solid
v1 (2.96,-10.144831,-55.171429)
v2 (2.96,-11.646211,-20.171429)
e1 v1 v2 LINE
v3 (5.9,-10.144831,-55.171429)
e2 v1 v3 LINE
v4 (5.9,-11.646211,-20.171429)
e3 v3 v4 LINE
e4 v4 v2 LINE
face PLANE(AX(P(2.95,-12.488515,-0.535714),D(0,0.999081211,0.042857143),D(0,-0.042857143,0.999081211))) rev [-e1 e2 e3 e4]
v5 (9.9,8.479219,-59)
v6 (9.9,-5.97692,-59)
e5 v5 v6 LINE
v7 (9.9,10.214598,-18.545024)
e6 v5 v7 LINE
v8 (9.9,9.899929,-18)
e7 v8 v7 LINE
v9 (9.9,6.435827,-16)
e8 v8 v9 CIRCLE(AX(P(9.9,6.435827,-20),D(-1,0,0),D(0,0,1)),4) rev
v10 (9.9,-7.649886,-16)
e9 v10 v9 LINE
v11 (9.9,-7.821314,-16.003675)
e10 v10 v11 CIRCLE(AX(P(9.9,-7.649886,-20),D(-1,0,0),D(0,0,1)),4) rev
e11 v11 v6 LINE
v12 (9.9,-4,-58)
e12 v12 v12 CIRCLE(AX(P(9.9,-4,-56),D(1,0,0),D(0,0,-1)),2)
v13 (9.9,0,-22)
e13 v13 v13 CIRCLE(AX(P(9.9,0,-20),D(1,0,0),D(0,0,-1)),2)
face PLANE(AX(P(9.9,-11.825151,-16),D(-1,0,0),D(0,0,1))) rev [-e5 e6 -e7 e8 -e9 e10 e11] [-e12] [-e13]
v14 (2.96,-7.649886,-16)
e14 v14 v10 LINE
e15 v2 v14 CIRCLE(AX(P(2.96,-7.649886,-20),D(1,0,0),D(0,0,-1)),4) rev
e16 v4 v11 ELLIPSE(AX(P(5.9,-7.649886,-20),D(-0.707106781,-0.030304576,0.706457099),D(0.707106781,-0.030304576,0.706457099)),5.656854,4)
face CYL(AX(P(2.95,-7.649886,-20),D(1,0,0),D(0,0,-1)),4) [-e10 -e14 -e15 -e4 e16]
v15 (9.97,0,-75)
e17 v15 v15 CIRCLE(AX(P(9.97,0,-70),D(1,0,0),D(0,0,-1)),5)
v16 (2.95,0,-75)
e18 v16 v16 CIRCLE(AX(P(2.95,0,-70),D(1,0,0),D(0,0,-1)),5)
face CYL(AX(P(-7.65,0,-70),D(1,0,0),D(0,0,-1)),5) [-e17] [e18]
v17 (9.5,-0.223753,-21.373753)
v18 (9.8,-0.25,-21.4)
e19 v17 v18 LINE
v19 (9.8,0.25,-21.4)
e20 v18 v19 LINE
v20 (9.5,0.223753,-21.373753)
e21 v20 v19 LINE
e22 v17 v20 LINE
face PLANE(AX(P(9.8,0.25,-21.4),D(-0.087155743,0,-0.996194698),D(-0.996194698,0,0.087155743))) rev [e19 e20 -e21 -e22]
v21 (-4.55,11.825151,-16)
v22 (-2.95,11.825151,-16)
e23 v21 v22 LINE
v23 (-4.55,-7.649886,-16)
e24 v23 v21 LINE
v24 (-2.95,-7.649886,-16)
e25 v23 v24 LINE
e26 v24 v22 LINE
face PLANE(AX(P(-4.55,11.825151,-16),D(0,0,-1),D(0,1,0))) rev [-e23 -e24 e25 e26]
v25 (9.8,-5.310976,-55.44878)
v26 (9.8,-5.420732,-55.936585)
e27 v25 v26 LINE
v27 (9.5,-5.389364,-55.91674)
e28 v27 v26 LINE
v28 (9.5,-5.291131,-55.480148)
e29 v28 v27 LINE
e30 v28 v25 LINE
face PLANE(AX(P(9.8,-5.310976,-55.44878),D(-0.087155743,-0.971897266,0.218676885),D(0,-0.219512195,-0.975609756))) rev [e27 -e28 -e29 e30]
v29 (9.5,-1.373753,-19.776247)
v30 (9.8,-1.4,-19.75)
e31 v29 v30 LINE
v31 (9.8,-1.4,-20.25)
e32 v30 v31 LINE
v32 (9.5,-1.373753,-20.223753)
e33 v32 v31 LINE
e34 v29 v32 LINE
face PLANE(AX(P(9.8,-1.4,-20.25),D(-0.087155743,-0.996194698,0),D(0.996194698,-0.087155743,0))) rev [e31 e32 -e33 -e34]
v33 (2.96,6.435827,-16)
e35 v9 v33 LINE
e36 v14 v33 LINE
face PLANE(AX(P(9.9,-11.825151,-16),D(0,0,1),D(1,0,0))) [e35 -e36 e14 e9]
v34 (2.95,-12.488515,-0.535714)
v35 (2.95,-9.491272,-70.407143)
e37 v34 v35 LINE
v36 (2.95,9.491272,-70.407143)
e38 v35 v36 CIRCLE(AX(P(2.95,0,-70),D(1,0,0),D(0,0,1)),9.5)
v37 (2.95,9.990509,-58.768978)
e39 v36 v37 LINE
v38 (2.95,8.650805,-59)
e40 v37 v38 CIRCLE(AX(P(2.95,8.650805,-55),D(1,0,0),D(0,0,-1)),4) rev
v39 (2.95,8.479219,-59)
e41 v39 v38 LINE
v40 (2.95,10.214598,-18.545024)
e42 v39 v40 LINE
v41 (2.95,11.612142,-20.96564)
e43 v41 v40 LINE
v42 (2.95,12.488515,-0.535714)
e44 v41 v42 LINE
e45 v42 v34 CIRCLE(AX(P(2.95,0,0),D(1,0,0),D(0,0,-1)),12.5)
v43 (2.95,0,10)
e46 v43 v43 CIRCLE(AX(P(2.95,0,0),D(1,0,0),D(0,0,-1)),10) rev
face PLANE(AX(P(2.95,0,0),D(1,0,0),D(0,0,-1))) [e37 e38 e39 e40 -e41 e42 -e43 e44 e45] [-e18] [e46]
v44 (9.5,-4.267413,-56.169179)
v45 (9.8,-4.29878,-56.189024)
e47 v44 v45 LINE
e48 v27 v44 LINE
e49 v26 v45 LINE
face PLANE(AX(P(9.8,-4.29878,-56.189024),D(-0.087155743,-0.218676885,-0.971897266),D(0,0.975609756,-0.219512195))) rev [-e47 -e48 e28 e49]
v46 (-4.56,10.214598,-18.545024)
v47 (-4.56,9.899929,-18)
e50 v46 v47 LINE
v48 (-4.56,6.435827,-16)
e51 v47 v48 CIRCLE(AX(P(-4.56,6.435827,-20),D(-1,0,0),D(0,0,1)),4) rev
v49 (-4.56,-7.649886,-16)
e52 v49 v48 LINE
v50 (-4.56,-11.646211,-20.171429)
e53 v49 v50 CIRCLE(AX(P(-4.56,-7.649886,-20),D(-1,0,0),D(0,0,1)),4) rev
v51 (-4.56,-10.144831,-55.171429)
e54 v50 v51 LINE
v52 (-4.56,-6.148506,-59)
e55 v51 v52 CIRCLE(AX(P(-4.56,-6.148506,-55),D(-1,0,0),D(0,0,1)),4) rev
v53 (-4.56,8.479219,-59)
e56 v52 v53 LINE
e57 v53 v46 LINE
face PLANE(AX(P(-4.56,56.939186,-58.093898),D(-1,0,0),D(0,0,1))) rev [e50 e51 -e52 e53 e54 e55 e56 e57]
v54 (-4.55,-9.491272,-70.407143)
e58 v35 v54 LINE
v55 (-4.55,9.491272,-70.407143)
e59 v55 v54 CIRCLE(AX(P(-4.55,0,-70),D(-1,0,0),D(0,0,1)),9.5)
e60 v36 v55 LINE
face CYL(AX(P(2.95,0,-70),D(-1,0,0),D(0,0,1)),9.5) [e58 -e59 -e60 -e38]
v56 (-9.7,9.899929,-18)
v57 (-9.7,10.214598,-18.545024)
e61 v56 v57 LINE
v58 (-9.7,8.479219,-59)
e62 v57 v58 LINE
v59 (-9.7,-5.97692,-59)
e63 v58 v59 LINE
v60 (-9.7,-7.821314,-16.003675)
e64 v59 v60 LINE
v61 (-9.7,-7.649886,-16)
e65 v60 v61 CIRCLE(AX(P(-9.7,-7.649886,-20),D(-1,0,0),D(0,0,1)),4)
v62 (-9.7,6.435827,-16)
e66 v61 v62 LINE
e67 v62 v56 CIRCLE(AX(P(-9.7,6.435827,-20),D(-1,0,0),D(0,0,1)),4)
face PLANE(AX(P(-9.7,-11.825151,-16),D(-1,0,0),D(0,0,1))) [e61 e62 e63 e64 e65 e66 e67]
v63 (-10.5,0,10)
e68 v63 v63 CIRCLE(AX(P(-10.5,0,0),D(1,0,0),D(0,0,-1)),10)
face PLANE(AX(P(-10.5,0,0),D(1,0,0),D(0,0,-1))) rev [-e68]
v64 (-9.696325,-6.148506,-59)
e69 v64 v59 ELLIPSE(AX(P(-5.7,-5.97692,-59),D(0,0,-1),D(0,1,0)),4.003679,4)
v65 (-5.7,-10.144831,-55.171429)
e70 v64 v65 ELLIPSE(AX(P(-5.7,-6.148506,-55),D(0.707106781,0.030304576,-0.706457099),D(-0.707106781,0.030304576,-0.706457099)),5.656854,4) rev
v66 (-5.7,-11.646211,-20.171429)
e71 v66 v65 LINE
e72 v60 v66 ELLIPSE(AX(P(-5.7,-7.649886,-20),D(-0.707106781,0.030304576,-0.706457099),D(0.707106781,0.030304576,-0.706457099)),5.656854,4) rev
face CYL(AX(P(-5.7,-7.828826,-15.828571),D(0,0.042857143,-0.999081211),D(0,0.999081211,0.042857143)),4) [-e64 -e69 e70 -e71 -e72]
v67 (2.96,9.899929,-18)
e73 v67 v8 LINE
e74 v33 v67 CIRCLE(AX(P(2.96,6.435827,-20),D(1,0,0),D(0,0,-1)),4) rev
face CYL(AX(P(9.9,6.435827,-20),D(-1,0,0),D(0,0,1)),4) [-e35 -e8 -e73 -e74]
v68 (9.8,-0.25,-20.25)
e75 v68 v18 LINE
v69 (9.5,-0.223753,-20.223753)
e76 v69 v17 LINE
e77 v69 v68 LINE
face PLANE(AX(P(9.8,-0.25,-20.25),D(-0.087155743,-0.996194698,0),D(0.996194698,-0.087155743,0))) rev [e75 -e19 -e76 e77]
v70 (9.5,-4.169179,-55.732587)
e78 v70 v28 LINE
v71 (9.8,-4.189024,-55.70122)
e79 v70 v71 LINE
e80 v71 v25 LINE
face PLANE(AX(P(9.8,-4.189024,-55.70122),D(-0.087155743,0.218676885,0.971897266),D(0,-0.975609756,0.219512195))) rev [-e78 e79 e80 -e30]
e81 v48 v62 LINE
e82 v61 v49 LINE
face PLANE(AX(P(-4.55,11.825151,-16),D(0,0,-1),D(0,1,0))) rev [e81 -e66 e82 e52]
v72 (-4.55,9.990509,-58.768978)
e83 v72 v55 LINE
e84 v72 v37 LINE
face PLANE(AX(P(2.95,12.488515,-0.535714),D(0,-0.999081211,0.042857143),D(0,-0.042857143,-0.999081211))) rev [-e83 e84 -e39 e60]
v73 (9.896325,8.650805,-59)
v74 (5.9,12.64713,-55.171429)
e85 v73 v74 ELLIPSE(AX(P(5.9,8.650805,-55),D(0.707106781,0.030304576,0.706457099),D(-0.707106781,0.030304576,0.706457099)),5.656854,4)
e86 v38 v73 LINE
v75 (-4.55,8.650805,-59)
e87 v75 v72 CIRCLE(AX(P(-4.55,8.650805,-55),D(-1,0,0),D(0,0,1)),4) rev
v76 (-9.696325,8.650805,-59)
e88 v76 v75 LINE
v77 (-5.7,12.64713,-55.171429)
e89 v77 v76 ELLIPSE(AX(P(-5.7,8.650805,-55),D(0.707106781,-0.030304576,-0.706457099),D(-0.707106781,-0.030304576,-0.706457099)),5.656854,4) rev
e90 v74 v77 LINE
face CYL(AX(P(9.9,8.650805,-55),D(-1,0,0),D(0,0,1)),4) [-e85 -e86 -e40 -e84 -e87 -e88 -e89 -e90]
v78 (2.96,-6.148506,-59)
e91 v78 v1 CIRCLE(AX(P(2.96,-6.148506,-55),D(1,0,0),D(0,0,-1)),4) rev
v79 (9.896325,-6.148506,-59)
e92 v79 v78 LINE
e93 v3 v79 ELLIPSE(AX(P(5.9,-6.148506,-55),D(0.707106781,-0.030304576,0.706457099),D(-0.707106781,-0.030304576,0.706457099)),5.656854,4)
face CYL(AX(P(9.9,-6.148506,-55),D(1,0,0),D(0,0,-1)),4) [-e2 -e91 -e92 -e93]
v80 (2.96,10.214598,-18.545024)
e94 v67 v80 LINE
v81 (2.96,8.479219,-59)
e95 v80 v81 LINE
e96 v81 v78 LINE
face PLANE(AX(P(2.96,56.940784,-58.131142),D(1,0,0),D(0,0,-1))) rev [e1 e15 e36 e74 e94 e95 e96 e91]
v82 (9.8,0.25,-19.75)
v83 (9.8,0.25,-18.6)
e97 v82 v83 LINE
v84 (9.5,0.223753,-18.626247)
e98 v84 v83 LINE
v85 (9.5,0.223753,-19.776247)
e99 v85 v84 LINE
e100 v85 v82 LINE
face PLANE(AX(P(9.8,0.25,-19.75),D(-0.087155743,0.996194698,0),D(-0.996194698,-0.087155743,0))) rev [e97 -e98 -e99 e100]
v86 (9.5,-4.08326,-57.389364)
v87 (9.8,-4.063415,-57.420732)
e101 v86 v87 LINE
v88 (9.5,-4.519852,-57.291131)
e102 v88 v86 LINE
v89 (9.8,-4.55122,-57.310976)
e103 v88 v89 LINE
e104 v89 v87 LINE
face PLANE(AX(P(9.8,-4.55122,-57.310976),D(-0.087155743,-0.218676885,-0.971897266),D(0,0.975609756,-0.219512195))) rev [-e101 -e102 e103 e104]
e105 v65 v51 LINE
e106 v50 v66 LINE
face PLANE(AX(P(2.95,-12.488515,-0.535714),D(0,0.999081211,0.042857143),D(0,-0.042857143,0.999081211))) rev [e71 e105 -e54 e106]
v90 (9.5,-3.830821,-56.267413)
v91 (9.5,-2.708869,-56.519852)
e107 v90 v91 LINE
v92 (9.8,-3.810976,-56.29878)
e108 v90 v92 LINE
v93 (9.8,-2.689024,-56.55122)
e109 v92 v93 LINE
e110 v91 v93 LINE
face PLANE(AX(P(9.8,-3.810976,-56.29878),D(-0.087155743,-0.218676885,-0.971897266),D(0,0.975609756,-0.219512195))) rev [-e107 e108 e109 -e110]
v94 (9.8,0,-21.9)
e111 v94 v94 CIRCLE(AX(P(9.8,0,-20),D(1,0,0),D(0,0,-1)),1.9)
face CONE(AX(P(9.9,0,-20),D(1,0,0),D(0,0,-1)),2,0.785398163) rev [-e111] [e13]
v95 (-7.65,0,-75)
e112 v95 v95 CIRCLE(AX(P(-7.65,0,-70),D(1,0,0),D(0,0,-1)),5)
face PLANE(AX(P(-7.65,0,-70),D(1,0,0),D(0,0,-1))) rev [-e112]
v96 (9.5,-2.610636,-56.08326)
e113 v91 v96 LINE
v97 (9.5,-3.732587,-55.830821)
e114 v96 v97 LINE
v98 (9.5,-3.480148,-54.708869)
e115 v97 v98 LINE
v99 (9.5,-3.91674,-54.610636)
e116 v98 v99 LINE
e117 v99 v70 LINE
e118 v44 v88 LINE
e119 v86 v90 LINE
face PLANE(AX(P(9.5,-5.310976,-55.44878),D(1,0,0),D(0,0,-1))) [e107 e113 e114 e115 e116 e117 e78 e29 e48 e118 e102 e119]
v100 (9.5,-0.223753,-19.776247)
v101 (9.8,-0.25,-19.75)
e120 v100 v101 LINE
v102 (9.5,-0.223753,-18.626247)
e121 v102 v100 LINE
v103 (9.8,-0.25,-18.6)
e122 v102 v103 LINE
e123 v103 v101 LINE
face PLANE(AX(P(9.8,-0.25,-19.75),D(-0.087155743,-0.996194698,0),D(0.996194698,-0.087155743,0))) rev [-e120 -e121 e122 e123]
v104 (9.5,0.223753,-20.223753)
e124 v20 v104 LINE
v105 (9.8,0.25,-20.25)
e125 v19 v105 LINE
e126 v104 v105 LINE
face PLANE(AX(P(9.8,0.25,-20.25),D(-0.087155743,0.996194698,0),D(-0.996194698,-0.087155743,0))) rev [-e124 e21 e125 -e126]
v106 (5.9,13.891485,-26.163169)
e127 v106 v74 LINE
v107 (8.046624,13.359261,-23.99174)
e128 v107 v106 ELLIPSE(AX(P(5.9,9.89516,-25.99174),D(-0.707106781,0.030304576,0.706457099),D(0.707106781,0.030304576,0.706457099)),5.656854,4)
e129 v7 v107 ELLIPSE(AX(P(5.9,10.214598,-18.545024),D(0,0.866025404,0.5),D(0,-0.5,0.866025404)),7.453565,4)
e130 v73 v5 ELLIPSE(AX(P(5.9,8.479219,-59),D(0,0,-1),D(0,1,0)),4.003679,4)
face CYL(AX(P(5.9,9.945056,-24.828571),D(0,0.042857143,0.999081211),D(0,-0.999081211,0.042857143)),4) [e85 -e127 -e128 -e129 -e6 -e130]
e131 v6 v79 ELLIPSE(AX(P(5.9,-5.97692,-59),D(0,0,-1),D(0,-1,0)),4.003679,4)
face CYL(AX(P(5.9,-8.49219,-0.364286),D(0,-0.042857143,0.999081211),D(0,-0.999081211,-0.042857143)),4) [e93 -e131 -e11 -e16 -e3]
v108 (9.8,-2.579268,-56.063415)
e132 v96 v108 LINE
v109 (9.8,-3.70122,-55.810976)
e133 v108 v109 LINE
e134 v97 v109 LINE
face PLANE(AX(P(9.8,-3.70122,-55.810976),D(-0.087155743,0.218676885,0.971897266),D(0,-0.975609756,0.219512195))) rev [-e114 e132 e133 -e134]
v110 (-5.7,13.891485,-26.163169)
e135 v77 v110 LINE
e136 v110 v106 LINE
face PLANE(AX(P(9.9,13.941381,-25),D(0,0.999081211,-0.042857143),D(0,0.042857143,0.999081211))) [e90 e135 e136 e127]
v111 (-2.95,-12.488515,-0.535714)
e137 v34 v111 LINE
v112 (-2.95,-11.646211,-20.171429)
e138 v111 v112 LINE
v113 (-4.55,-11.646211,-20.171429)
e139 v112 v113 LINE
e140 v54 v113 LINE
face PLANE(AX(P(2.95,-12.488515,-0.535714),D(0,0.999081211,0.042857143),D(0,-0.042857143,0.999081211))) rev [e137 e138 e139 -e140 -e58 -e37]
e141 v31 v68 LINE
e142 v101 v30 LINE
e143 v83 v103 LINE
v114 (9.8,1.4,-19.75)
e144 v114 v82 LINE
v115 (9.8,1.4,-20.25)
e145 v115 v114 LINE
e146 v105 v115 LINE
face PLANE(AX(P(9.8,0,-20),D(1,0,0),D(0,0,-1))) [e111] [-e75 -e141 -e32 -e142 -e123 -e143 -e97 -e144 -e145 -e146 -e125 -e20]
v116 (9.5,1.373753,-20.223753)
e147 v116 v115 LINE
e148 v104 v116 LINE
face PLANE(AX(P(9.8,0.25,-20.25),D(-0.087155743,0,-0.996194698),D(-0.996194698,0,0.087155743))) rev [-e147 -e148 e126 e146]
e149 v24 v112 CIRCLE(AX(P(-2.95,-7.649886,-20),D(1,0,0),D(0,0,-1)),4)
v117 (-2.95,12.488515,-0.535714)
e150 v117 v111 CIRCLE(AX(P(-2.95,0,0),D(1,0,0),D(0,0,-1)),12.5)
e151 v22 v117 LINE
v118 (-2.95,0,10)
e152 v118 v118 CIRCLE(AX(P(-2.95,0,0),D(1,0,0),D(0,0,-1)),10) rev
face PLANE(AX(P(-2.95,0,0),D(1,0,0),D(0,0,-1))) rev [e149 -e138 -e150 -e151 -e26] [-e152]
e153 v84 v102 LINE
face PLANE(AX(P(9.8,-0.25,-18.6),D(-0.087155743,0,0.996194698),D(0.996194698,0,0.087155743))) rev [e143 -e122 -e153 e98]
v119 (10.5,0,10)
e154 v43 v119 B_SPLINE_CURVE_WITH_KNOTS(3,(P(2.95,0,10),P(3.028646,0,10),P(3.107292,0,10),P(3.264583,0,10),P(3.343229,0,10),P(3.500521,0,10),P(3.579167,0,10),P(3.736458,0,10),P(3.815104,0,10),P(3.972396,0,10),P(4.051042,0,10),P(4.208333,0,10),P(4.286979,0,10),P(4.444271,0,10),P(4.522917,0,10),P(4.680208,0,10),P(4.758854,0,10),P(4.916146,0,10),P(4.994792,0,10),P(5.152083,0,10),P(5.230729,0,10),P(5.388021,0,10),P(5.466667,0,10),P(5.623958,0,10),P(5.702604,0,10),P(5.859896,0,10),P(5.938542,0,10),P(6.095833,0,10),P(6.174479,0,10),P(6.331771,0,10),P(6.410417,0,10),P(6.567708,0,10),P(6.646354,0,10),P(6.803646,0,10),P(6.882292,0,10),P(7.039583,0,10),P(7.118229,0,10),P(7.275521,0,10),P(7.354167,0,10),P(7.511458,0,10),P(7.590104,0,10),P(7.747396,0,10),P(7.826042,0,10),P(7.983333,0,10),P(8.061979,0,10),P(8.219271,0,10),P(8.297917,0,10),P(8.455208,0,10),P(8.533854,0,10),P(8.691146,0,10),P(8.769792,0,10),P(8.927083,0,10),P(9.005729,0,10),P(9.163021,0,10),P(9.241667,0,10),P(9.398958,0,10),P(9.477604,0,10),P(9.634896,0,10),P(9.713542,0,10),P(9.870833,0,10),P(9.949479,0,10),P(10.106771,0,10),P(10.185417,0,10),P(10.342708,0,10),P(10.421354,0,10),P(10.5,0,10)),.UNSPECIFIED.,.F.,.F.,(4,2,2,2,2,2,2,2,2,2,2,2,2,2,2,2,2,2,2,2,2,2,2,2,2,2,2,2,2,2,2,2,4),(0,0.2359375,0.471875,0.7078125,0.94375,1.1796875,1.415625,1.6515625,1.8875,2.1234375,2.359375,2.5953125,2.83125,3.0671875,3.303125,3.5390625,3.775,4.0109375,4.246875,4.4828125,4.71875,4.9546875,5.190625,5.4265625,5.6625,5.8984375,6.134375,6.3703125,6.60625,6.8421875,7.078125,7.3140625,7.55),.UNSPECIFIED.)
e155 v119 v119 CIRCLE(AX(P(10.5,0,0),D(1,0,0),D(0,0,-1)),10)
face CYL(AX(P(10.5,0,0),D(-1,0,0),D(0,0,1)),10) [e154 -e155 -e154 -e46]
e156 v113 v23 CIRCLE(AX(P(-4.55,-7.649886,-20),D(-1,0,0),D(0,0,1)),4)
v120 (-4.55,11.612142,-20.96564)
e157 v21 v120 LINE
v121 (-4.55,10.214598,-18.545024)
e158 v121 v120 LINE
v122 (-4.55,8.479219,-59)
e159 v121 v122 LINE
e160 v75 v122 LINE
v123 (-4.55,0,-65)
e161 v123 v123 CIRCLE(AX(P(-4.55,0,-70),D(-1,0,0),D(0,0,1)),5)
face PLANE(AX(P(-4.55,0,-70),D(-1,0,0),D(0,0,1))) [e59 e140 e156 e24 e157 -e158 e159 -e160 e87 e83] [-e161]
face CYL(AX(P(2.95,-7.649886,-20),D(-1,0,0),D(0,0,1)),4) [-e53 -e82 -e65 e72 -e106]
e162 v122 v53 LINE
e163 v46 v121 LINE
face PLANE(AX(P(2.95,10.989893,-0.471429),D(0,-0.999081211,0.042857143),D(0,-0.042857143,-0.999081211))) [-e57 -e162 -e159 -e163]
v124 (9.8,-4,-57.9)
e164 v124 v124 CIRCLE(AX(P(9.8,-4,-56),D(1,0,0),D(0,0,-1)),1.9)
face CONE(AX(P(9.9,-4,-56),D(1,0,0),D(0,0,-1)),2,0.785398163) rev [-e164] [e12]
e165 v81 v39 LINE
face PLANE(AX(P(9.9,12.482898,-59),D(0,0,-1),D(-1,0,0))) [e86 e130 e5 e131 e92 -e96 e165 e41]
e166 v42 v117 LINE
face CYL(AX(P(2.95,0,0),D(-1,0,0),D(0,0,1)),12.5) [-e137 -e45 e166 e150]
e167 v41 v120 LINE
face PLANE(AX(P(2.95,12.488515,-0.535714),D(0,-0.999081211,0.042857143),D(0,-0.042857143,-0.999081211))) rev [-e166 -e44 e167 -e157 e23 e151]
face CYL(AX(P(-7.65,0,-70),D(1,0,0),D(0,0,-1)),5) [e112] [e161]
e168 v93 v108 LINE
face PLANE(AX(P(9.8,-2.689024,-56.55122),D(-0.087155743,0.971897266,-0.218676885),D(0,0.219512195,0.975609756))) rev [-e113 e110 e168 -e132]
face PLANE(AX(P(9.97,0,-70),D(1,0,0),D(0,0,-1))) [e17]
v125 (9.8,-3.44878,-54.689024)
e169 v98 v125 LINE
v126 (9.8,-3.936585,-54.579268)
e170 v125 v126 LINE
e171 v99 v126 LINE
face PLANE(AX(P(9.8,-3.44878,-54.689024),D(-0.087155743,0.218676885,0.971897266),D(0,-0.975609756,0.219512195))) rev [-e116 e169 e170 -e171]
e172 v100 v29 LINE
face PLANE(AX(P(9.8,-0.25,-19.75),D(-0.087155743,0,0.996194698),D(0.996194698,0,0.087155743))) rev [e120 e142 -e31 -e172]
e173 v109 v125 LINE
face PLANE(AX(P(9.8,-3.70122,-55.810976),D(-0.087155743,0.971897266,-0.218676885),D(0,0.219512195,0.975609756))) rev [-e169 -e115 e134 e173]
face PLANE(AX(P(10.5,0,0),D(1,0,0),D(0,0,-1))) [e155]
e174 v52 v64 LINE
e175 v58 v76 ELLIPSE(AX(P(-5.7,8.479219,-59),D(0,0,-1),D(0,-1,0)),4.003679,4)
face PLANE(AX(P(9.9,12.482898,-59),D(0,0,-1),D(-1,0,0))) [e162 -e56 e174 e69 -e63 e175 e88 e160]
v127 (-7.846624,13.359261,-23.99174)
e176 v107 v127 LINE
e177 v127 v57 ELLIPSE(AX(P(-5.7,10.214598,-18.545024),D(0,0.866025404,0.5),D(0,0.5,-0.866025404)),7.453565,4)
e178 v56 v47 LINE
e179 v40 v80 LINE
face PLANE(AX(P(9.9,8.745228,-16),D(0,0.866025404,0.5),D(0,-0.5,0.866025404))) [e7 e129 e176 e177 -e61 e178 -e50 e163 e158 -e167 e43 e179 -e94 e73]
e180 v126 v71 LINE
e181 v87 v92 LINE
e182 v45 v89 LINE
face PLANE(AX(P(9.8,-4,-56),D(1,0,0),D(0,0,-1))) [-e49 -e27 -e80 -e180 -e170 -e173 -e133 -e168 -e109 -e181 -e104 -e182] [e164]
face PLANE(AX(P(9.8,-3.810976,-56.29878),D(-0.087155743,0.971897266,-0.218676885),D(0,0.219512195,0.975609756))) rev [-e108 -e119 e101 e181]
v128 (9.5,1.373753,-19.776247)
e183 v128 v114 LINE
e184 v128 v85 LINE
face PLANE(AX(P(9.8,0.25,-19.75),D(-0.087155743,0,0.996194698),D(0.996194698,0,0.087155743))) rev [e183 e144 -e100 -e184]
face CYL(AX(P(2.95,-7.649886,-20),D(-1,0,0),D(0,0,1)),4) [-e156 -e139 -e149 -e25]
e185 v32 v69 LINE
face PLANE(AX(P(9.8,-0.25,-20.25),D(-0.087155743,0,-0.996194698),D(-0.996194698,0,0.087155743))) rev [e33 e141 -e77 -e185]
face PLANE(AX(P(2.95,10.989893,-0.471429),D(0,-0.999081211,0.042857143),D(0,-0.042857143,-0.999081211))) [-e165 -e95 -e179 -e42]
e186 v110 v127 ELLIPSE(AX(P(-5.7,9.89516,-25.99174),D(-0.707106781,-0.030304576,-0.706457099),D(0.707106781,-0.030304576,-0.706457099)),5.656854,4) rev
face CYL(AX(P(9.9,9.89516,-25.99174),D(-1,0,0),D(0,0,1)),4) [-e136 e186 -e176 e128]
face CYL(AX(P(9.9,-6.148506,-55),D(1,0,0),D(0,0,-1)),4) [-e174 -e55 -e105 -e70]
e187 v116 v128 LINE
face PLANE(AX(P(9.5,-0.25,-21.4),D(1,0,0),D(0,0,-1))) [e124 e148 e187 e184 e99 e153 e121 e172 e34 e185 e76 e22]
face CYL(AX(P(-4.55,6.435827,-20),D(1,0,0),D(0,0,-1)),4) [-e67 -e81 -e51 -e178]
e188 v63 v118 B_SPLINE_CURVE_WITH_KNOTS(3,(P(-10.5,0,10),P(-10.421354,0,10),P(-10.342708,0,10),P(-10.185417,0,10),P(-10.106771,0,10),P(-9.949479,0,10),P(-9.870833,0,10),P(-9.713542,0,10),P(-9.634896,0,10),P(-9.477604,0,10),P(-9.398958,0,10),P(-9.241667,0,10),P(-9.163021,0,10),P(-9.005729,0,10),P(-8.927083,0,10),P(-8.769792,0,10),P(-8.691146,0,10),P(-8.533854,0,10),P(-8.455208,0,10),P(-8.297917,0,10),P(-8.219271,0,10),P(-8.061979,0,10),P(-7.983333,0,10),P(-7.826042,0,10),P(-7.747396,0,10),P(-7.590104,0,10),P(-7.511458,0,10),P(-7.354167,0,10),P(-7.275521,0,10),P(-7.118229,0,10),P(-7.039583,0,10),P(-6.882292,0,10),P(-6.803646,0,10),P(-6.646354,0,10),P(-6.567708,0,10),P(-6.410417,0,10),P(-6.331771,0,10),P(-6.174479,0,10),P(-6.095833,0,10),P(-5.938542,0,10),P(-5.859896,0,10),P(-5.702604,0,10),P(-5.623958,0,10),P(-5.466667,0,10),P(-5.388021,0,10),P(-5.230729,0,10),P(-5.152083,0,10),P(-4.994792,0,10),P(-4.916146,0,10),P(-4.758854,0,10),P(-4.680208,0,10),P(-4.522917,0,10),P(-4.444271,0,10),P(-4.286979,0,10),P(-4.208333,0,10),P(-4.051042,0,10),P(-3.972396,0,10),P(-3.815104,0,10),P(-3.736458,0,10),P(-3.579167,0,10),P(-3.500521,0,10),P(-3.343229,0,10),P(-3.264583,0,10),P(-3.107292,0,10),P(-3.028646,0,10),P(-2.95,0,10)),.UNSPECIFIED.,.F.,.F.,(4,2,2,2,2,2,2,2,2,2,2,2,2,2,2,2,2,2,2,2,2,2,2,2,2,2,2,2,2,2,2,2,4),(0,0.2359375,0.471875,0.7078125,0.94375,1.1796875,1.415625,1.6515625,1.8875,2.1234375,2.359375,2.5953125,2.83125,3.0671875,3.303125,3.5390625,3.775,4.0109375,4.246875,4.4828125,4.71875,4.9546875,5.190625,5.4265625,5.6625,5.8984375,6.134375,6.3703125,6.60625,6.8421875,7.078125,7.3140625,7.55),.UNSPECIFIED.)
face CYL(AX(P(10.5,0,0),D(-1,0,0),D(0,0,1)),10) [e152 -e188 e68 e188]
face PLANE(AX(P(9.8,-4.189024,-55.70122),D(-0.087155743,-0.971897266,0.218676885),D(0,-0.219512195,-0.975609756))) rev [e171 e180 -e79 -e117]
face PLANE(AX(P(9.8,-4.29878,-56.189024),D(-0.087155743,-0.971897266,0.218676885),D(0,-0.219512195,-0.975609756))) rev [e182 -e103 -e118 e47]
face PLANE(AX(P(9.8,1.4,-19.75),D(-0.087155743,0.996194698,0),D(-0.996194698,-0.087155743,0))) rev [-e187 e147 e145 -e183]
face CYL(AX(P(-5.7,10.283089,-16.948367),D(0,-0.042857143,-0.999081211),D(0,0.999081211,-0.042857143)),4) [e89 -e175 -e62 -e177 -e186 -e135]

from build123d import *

# Parameters (mm, degrees)
BOSS_EXTRUDE1_DEPTH              = 2.95
BOSS_EXTRUDE2_DEPTH              = 1.6
SKETCH3_R                        = 10
BOSS_EXTRUDE3_DEPTH              = 10.5
FILLET1_R                        = 4
BOSS_EXTRUDE4_DEPTH              = 5.15
BOSS_EXTRUDE4_DEPTH_BACK         = 14.45
CUT_EXTRUDE1_REACH               = 87.429
CUT_EXTRUDE1_OFFSET_FROM_SURFACE = 1.5
SKETCH6_W                        = 0.00999999999999979
SKETCH6_H                        = 45.002265551352366
SKETCH6_W_2                      = 0.01000000000000023
SKETCH6_H_2                      = 45.03954427852518
FILLET2_R                        = 4
BOSS_EXTRUDE5_DEPTH              = 7.02
BOSS_EXTRUDE5_DEPTH_BACK         = 10.6
SKETCH7_R                        = 5.000000000000004
SKETCH8_R                        = 2.000000000000003
CUT_EXTRUDE2_DEPTH               = 0.1
CUT_EXTRUDE2_DRAFT               = -45.0000000000001
CUT_EXTRUDE2_PROFILE_2_DEPTH     = 0.1
CUT_EXTRUDE2_PROFILE_2_DRAFT     = -45.0000000000001
CUT_EXTRUDE3_DEPTH               = 0.3
CUT_EXTRUDE3_DRAFT               = -5.000000000000011
CUT_EXTRUDE3_PROFILE_2_DEPTH     = 0.3
CUT_EXTRUDE3_PROFILE_2_DRAFT     = -5.000000000000011


with BuildPart() as part:
    # Sketch1 → Boss-Extrude1 (new, symmetric)
    with BuildSketch(Plane(origin=(0, 0, 0), x_dir=(0, 0, -1), z_dir=(1, 0, 0))):
        with BuildLine():
            Line((0.5357142857142857, -12.488515132075614), (70.40714285714286, -9.491271500377467))
            ThreePointArc((70.40714285714286, -9.491271500377467), (79.5, 0), (70.40714285714286, 9.491271500377463))
            Line((70.40714285714286, 9.491271500377463), (0.5357142857142858, 12.488515132075614))
            ThreePointArc((0.5357142857142858, 12.488515132075614), (-12.499999999999998, 1.53e-15), (0.5357142857142857, -12.488515132075614))
        make_face()
    extrude(amount=BOSS_EXTRUDE1_DEPTH, both=True)

    # Sketch2 → Boss-Extrude2 (add)
    with BuildSketch(Plane.ZY.offset(2.95)):
        with BuildLine():
            Line((-70.40714285714286, 9.491271500377463), (-16, 11.825150537654586))
            Line((-16, 11.825150537654586), (-15.999999999999993, -11.825150537654586))
            Line((-15.999999999999993, -11.825150537654586), (-70.40714285714286, -9.491271500377465))
            ThreePointArc((-70.40714285714286, -9.491271500377465), (-79.5, 1.16e-15), (-70.40714285714286, 9.491271500377463))
        make_face()
    extrude(amount=BOSS_EXTRUDE2_DEPTH)

    # Sketch3 → Boss-Extrude3 (add, symmetric)
    with BuildSketch(Plane(origin=(0, 0, 0), x_dir=(0, 0, -1), z_dir=(1, 0, 0))):
        with Locations(Location((0, 0, 0), (0, 0, 180))):
            Circle(SKETCH3_R)
    extrude(amount=BOSS_EXTRUDE3_DEPTH, both=True)

    # Fillet1
    fillet1_edges = [part.edges().sort_by_distance(p)[0] for p in [
        (-3.75, -11.825150537654586, -15.999999999999993),
    ]]
    fillet(fillet1_edges, radius=FILLET1_R)

    # Sketch4 → Boss-Extrude4 (add, two sides: drawn at the far end of the back side and taken through both)
    with BuildSketch(Plane.ZY.offset(4.55).offset(-BOSS_EXTRUDE4_DEPTH_BACK)):
        Polygon((-15.999999999999993, -11.825150537654581), (-15.999999999999993, 8.745228199074802), (-24.999999999999993, 13.941380621781402), (-58.99999999999999, 12.482897725964271), (-58.99999999999999, -9.980598640003508), align=None)
    extrude(amount=BOSS_EXTRUDE4_DEPTH + BOSS_EXTRUDE4_DEPTH_BACK)

    # Cut-Extrude1: up to this face of the body (flat: up to its plane, moved by the offset)
    cut_extrude1_end = Plane(part.part.faces().sort_by_distance((-0.231891902, 12.029817895, -11.228816075))[0]).offset(-CUT_EXTRUDE1_OFFSET_FROM_SURFACE)
    # Sketch6 → Cut-Extrude1 (cut, up to the picked face)
    with BuildSketch(Plane(origin=(0, -12.488515132075618, -0.5357142857142859), x_dir=(1, 0, 0), z_dir=(0, -0.9990812105660494, -0.04285714285714288)), mode=Mode.PRIVATE) as cut_extrude1_sk1:
        with Locations((-4.555, -37.97963997883348)):
            Rectangle(SKETCH6_W, SKETCH6_H)
    cut_extrude1_tool1 = split(extrude(cut_extrude1_sk1.sketch, amount=-CUT_EXTRUDE1_REACH, mode=Mode.PRIVATE), bisect_by=cut_extrude1_end, keep=Keep.BOTH, mode=Mode.PRIVATE)
    # Sketch6 → Cut-Extrude1 (cut, up to the picked face)
    with BuildSketch(Plane(origin=(0, -12.488515132075618, -0.5357142857142859), x_dir=(1, 0, 0), z_dir=(0, -0.9990812105660494, -0.04285714285714288)), mode=Mode.PRIVATE) as cut_extrude1_sk2:
        with Locations((2.955, -37.99827934241989)):
            Rectangle(SKETCH6_W_2, SKETCH6_H_2)
    cut_extrude1_tool2 = split(extrude(cut_extrude1_sk2.sketch, amount=-CUT_EXTRUDE1_REACH, mode=Mode.PRIVATE), bisect_by=cut_extrude1_end, keep=Keep.BOTH, mode=Mode.PRIVATE)
    add(cut_extrude1_tool1.solids().sort_by(Axis((-4.555, -10.860816, -38.480459), (0, 0.9990812105660494, 0.04285714285714288)))[0], mode=Mode.SUBTRACT)
    add(cut_extrude1_tool2.solids().sort_by(Axis((2.955, -10.860017, -38.499081), (0, 0.9990812105660494, 0.04285714285714288)))[0], mode=Mode.SUBTRACT)

    # Fillet2
    # the kernel refuses this fillet: 4 mm, written as the material it adds along each edge
    # the kernel refuses this fillet: 4 mm, written as the material it takes off along each edge
    with BuildSketch(Plane(origin=(-14.988161901436335, -11.825150537654586, -15.999999999999993), x_dir=(0, 0.04285714285714257, -0.9990812105660493), z_dir=(1, 0, 0))) as fillet2_2_piece_1:
        with BuildLine():
            CenterArc((FILLET2_R * 1.04381619014, FILLET2_R), FILLET2_R, 177.54371427641803, 92.45628572358197)
            Line((FILLET2_R * 0.0447349795776, FILLET2_R * 1.04285714286), (0, 0))
            Line((0, 0), (FILLET2_R * 1.04381619014, 0))
        make_face()
    extrude(amount=12.038161901436336, mode=Mode.SUBTRACT)
    with BuildSketch(Plane(origin=(-14.988161901436335, -11.825150537654586, -15.999999999999993), x_dir=(0, 0.04285714285714257, -0.9990812105660493), z_dir=(1, 0, 0))) as fillet2_2_piece_2_section:
        with BuildLine():
            CenterArc((FILLET2_R * 1.04381619014, FILLET2_R), FILLET2_R, 177.54371427641803, 92.45628572358197)
            Line((FILLET2_R * 0.0447349795776, FILLET2_R * 1.04285714286), (0, 0))
            Line((0, 0), (FILLET2_R * 1.04381619014, 0))
        make_face()
    fillet2_2_piece_2 = extrude(amount=22.47632380287267, mode=Mode.PRIVATE)
    fillet2_2_piece_2 = split(fillet2_2_piece_2, bisect_by=Plane(origin=(2.9600000000000004, -10.846311572952873, -16.937750318441594), z_dir=(1, 0, 0)), keep=Keep.TOP, mode=Mode.PRIVATE)
    add(fillet2_2_piece_2, mode=Mode.SUBTRACT)
    with BuildSketch(Plane(origin=(-7.478161901436335, -11.825150537654586, -15.999999999999993), x_dir=(0, 0.04285714285714257, -0.9990812105660493), z_dir=(1, 0, 0))) as fillet2_2_piece_3_section:
        with BuildLine():
            CenterArc((FILLET2_R * 1.04381619014, FILLET2_R), FILLET2_R, 177.54371427641803, 92.45628572358197)
            Line((FILLET2_R * 0.0447349795776, FILLET2_R * 1.04285714286), (0, 0))
            Line((0, 0), (FILLET2_R * 1.04381619014, 0))
        make_face()
    fillet2_2_piece_3 = extrude(amount=27.816323802872674, mode=Mode.PRIVATE)
    fillet2_2_piece_3 = split(fillet2_2_piece_3, bisect_by=Plane(origin=(-2.95, -10.846311572952875, -16.937750318441612), z_dir=(-1, 0, 0)), keep=Keep.TOP, mode=Mode.PRIVATE)
    add(fillet2_2_piece_3, mode=Mode.SUBTRACT)
    with BuildSketch(Plane(origin=(2.960000000000001, -11.825150537654581, -15.999999999999993), x_dir=(0, 0.042857142857141296, -0.9990812105660493), z_dir=(1, 0, 0))) as fillet2_2_piece_4:
        with BuildLine():
            CenterArc((FILLET2_R * 1.04381619014, FILLET2_R), FILLET2_R, 177.54371427641803, 92.45628572358203)
            Line((FILLET2_R * 0.0447349795776, FILLET2_R * 1.04285714286), (0, 0))
            Line((0, 0), (FILLET2_R * 1.04381619014, -1e-17))
        make_face()
    extrude(amount=17.378161901436336, mode=Mode.SUBTRACT)
    with BuildSketch(Plane(origin=(9.899999999999999, -9.552027211432081, -68.9908121056605), x_dir=(0, 0.9990812105660493, 0.04285714285714272), z_dir=(0, -0.042857142857142726, 0.9990812105660493))) as fillet2_2_piece_5:
        with BuildLine():
            CenterArc((FILLET2_R, FILLET2_R), FILLET2_R, 180, 90)
            Line((-6.1e-16, FILLET2_R), (0, 0))
            Line((0, 0), (FILLET2_R, 0))
        make_face()
    extrude(amount=63.039544278525156, mode=Mode.SUBTRACT)
    with BuildSketch(Plane(origin=(-6.620230786249788, -9.980598640003508, -58.99999999999999), x_dir=(0, -0.042857142857142885, 0.9990812105660493), z_dir=(1, 0, 0))) as fillet2_2_piece_6_section:
        with BuildLine():
            CenterArc((FILLET2_R * 0.958023078625, -FILLET2_R), FILLET2_R, 89.99999999999999, 87.54371427641804)
            Line((-FILLET2_R * 0.0410581319411, -FILLET2_R * 0.957142857143), (0, 0))
            Line((0, 0), (FILLET2_R * 0.958023078625, 0))
        make_face()
    fillet2_2_piece_6 = extrude(amount=26.100461572499576, mode=Mode.PRIVATE)
    fillet2_2_piece_6 = split(fillet2_2_piece_6, bisect_by=Plane(origin=(-4.55, -9.166381712824048, -58.15010718912109), z_dir=(-1, 0, 0)), keep=Keep.TOP, mode=Mode.PRIVATE)
    add(fillet2_2_piece_6, mode=Mode.SUBTRACT)
    with BuildSketch(Plane(origin=(2.960000000000001, -9.980598640003508, -58.99999999999999), x_dir=(0, -0.042857142857142885, 0.9990812105660493), z_dir=(1, 0, 0))) as fillet2_2_piece_7:
        with BuildLine():
            CenterArc((FILLET2_R * 0.958023078625, -FILLET2_R), FILLET2_R, 89.99999999999999, 87.54371427641804)
            Line((-FILLET2_R * 0.0410581319411, -FILLET2_R * 0.957142857143), (0, 0))
            Line((0, 0), (FILLET2_R * 0.958023078625, 0))
        make_face()
    extrude(amount=16.520230786249787, mode=Mode.SUBTRACT)
    with BuildSketch(Plane(origin=(-19.28023078624979, 12.482897725964271, -58.99999999999999), x_dir=(0, 0.042857142857142885, 0.9990812105660493), z_dir=(1, 0, 0))) as fillet2_2_piece_8_section:
        with BuildLine():
            CenterArc((FILLET2_R * 0.958023078625, FILLET2_R), FILLET2_R, 182.45628572358197, 87.54371427641803)
            Line((-FILLET2_R * 0.0410581319411, FILLET2_R * 0.957142857143), (0, 0))
            Line((0, 0), (FILLET2_R * 0.958023078625, 0))
        make_face()
    fillet2_2_piece_8 = extrude(amount=38.76046157249958, mode=Mode.PRIVATE)
    fillet2_2_piece_8 = split(fillet2_2_piece_8, bisect_by=Plane(origin=(-7.12500000000003, 10.021335989457187, -58.05033519049316), z_dir=(0, 0.9990812105660493, -0.042857142857142906)), keep=Keep.TOP, mode=Mode.PRIVATE)
    add(fillet2_2_piece_8, mode=Mode.SUBTRACT)
    with BuildSketch(Plane(origin=(-19.28023078624979, 12.482897725964271, -58.99999999999999), x_dir=(0, 0.042857142857142885, 0.9990812105660493), z_dir=(1, 0, 0))) as fillet2_2_piece_9_section:
        with BuildLine():
            CenterArc((FILLET2_R * 0.958023078625, FILLET2_R), FILLET2_R, 182.45628572358197, 87.54371427641803)
            Line((-FILLET2_R * 0.0410581319411, FILLET2_R * 0.957142857143), (0, 0))
            Line((0, 0), (FILLET2_R * 0.958023078625, 0))
        make_face()
    fillet2_2_piece_9 = extrude(amount=38.76046157249958, mode=Mode.PRIVATE)
    fillet2_2_piece_9 = split(fillet2_2_piece_9, bisect_by=Plane(origin=(-4.55, 9.653804076800146, -58.93114204733473), z_dir=(-1, 0, 0)), keep=Keep.TOP, mode=Mode.PRIVATE)
    add(fillet2_2_piece_9, mode=Mode.SUBTRACT)
    with BuildSketch(Plane(origin=(-19.28023078624979, 12.482897725964271, -58.99999999999999), x_dir=(0, 0.042857142857142885, 0.9990812105660493), z_dir=(1, 0, 0))) as fillet2_2_piece_10_section:
        with BuildLine():
            CenterArc((FILLET2_R * 0.958023078625, FILLET2_R), FILLET2_R, 182.45628572358197, 87.54371427641803)
            Line((-FILLET2_R * 0.0410581319411, FILLET2_R * 0.957142857143), (0, 0))
            Line((0, 0), (FILLET2_R * 0.958023078625, 0))
        make_face()
    fillet2_2_piece_10 = extrude(amount=38.76046157249958, mode=Mode.PRIVATE)
    fillet2_2_piece_10 = split(fillet2_2_piece_10, bisect_by=Plane(origin=(2.95, 9.653804076800148, -58.931142047334724), z_dir=(1, 0, 0)), keep=Keep.TOP, mode=Mode.PRIVATE)
    add(fillet2_2_piece_10, mode=Mode.SUBTRACT)
    with BuildSketch(Plane(origin=(9.899999999999999, 14.36995205035283, -15.009187894339503), x_dir=(-1, 0, 0), z_dir=(0, -0.04285714285714283, -0.9990812105660493))) as fillet2_2_piece_11:
        with BuildLine():
            CenterArc((FILLET2_R, -FILLET2_R), FILLET2_R, 90, 90)
            Line((0, -FILLET2_R), (0, 0))
            Line((0, 0), (FILLET2_R, 0))
        make_face()
    extrude(amount=54.03126756906639, mode=Mode.SUBTRACT)
    with BuildSketch(Plane(origin=(12.810595773347721, 13.941380621781402, -24.999999999999993), x_dir=(0, -0.4999999999999976, 0.8660254037844399), z_dir=(-1, 0, 0))) as fillet2_2_piece_12:
        with BuildLine():
            CenterArc((FILLET2_R * 0.291059577335, -FILLET2_R), FILLET2_R, 90.00000000000003, 32.45628572358184)
            Line((-FILLET2_R * 0.245596402396, -FILLET2_R * 0.156198862635), (0, 0))
            Line((0, 0), (FILLET2_R * 0.291059577335, 4e-17))
        make_face()
    extrude(amount=25.421191546695447, mode=Mode.SUBTRACT)
    with BuildSketch(Plane(origin=(15.673502691896278, 8.745228199074802, -15.999999999999993), x_dir=(0, 0.49999999999999767, -0.8660254037844399), z_dir=(-1, 0, 0))) as fillet2_2_piece_13:
        with BuildLine():
            CenterArc((FILLET2_R * 0.57735026919, FILLET2_R), FILLET2_R, 209.99999999999983, 60.00000000000023)
            Line((-FILLET2_R * 0.288675134595, FILLET2_R * 0.5), (0, 0))
            Line((0, 0), (FILLET2_R * 0.57735026919, 0))
        make_face()
    extrude(amount=12.713502691896277, mode=Mode.SUBTRACT)
    with BuildSketch(Plane(origin=(-9.7, -9.55202721143208, -68.99081210566048), x_dir=(1, -1.5e-16, -1e-17), z_dir=(0, -0.042857142857142726, 0.9990812105660493))) as fillet2_2_piece_14:
        with BuildLine():
            CenterArc((FILLET2_R, FILLET2_R), FILLET2_R, 180, 90)
            Line((-6.1e-16, FILLET2_R), (0, 0))
            Line((0, 0), (FILLET2_R, 0))
        make_face()
    extrude(amount=63.039544278525156, mode=Mode.SUBTRACT)
    with BuildSketch(Plane(origin=(-9.7, 14.36995205035283, -15.009187894339501), x_dir=(0, -0.9990812105660493, 0.04285714285714283), z_dir=(0, -0.04285714285714283, -0.9990812105660493))) as fillet2_2_piece_15:
        with BuildLine():
            CenterArc((FILLET2_R, -FILLET2_R), FILLET2_R, 90, 90)
            Line((-1.77e-15, -FILLET2_R), (0, 0))
            Line((0, 0), (FILLET2_R, 0))
        make_face()
    extrude(amount=54.031267569066415, mode=Mode.SUBTRACT)
    with BuildSketch(Plane(origin=(1.2135026918962772, 8.745228199074806, -15.999999999999998), x_dir=(0, 0.4999999999999975, -0.8660254037844403), z_dir=(-1, 0, 0))) as fillet2_2_piece_16_section:
        with BuildLine():
            CenterArc((FILLET2_R * 0.57735026919, FILLET2_R), FILLET2_R, 209.99999999999983, 60.00000000000017)
            Line((-FILLET2_R * 0.288675134595, FILLET2_R * 0.5), (0, 0))
            Line((0, 0), (FILLET2_R * 0.57735026919, 0))
        make_face()
    fillet2_2_piece_16 = extrude(amount=16.687005383792552, mode=Mode.PRIVATE)
    fillet2_2_piece_16 = split(fillet2_2_piece_16, bisect_by=Plane(origin=(-4.55, 8.502953144076557, -16.419632704663513), z_dir=(-1, 0, 0)), keep=Keep.TOP, mode=Mode.PRIVATE)
    add(fillet2_2_piece_16, mode=Mode.SUBTRACT)
    with BuildSketch(Plane(origin=(-19.28023078624979, -9.980598640003508, -58.99999999999999), x_dir=(0, -0.042857142857142885, 0.9990812105660493), z_dir=(1, 0, 0))) as fillet2_2_piece_17_section:
        with BuildLine():
            CenterArc((FILLET2_R * 0.958023078625, -FILLET2_R), FILLET2_R, 89.99999999999999, 87.54371427641804)
            Line((-FILLET2_R * 0.0410581319411, -FILLET2_R * 0.957142857143), (0, 0))
            Line((0, 0), (FILLET2_R * 0.958023078625, 0))
        make_face()
    fillet2_2_piece_17 = extrude(amount=24.30046157249958, mode=Mode.PRIVATE)
    fillet2_2_piece_17 = split(fillet2_2_piece_17, bisect_by=Plane(origin=(-4.55, -9.166381712824048, -58.150107189121094), z_dir=(-1, 0, 0)), keep=Keep.TOP, mode=Mode.PRIVATE)
    add(fillet2_2_piece_17, mode=Mode.SUBTRACT)
    with BuildSketch(Plane(origin=(-19.28023078624979, -9.980598640003508, -58.99999999999999), x_dir=(0, -0.042857142857142885, 0.9990812105660493), z_dir=(1, 0, 0))) as fillet2_2_piece_18_section:
        with BuildLine():
            CenterArc((FILLET2_R * 0.958023078625, -FILLET2_R), FILLET2_R, 89.99999999999999, 87.54371427641804)
            Line((-FILLET2_R * 0.0410581319411, -FILLET2_R * 0.957142857143), (0, 0))
            Line((0, 0), (FILLET2_R * 0.958023078625, 0))
        make_face()
    fillet2_2_piece_18 = extrude(amount=24.30046157249958, mode=Mode.PRIVATE)
    fillet2_2_piece_18 = split(fillet2_2_piece_18, bisect_by=Plane(origin=(2.9600000000000004, -9.16638171282405, -58.15010718912107), z_dir=(1, 0, 0)), keep=Keep.TOP, mode=Mode.PRIVATE)
    add(fillet2_2_piece_18, mode=Mode.SUBTRACT)
    with BuildSketch(Plane(origin=(-20.138161901436334, -11.825150537654586, -15.999999999999993), x_dir=(0, 1, 0), z_dir=(1, 0, 0))) as fillet2_2_piece_19_section:
        with BuildLine():
            CenterArc((FILLET2_R * 1.04381619014, -FILLET2_R), FILLET2_R, 89.99999999999999, 92.45628572358197)
            Line((FILLET2_R * 0.0447349795776, -FILLET2_R * 1.04285714286), (0, 0))
            Line((0, 0), (FILLET2_R * 1.04381619014, 0))
        make_face()
    fillet2_2_piece_19 = extrude(amount=26.01632380287267, mode=Mode.PRIVATE)
    fillet2_2_piece_19 = split(fillet2_2_piece_19, bisect_by=Plane(origin=(-2.95, -10.846311572952871, -16.93775031844161), z_dir=(-1, 0, 0)), keep=Keep.TOP, mode=Mode.PRIVATE)
    add(fillet2_2_piece_19, mode=Mode.SUBTRACT)
    with BuildSketch(Plane(origin=(-20.138161901436334, -11.825150537654586, -15.999999999999993), x_dir=(0, 1, 0), z_dir=(1, 0, 0))) as fillet2_2_piece_20_section:
        with BuildLine():
            CenterArc((FILLET2_R * 1.04381619014, -FILLET2_R), FILLET2_R, 89.99999999999999, 92.45628572358197)
            Line((FILLET2_R * 0.0447349795776, -FILLET2_R * 1.04285714286), (0, 0))
            Line((0, 0), (FILLET2_R * 1.04381619014, 0))
        make_face()
    fillet2_2_piece_20 = extrude(amount=26.01632380287267, mode=Mode.PRIVATE)
    fillet2_2_piece_20 = split(fillet2_2_piece_20, bisect_by=Plane(origin=(2.9600000000000004, -10.846311572952871, -16.937750318441594), z_dir=(1, 0, 0)), keep=Keep.TOP, mode=Mode.PRIVATE)
    add(fillet2_2_piece_20, mode=Mode.SUBTRACT)

    # Sketch7 → Boss-Extrude5 (add, two sides: drawn at the far end of the back side and taken through both)
    with BuildSketch(Plane(origin=(2.95, 0, 0), x_dir=(0, 0, -1), z_dir=(1, 0, 0)).offset(-BOSS_EXTRUDE5_DEPTH_BACK)):
        with Locations((70, 0)):
            Circle(SKETCH7_R)
    extrude(amount=BOSS_EXTRUDE5_DEPTH + BOSS_EXTRUDE5_DEPTH_BACK)


with BuildPart() as cut_extrude2_tool:
    # Sketch8 → Cut-Extrude2 (with draft: the straight prism first)
    with BuildSketch(Plane(origin=(9.899999999999999, 0, 0), x_dir=(0, 0, -1), z_dir=(1, 0, 0))):
        with Locations((19.99999999999999, 0)):
            Circle(SKETCH8_R)
    extrude(amount=-CUT_EXTRUDE2_DEPTH)
    # Cut-Extrude2: the draft: its side faces are tilted about the plane it starts from
    cut_extrude2_sides = [cut_extrude2_tool.faces().sort_by_distance(p)[0] for p in [
        (9.85, 0, -18),
    ]]
    draft(cut_extrude2_sides, Plane(origin=(9.899999999999999, 0, 0), x_dir=(0, 0, -1), z_dir=(1, 0, 0)), CUT_EXTRUDE2_DRAFT)


with BuildPart() as part_1:
    add(part.part)

    # Cut-Extrude2: cut by cut_extrude2_tool
    add(cut_extrude2_tool.part, mode=Mode.SUBTRACT)


with BuildPart() as cut_extrude2_profile_2_tool:
    # Sketch8 → Cut-Extrude2 profile 2 (with draft: the straight prism first)
    with BuildSketch(Plane(origin=(9.899999999999999, 0, 0), x_dir=(0, 0, -1), z_dir=(1, 0, 0))):
        with Locations((55.999999999999986, -4)):
            Circle(SKETCH8_R)
    extrude(amount=-CUT_EXTRUDE2_PROFILE_2_DEPTH)
    # Cut-Extrude2 profile 2: the draft: its side faces are tilted about the plane it starts from
    cut_extrude2_profile_2_sides = [cut_extrude2_profile_2_tool.faces().sort_by_distance(p)[0] for p in [
        (9.85, -4, -54),
    ]]
    draft(cut_extrude2_profile_2_sides, Plane(origin=(9.899999999999999, 0, 0), x_dir=(0, 0, -1), z_dir=(1, 0, 0)), CUT_EXTRUDE2_PROFILE_2_DRAFT)


with BuildPart() as part_2:
    add(part_1.part)

    # Cut-Extrude2 profile 2: cut by cut_extrude2_profile_2_tool
    add(cut_extrude2_profile_2_tool.part, mode=Mode.SUBTRACT)


with BuildPart() as cut_extrude3_tool:
    # Sketch9 → Cut-Extrude3 (with draft: the straight prism first)
    with BuildSketch(Plane(origin=(9.799999999999999, 0, 0), x_dir=(0, 0, -1), z_dir=(1, 0, 0))):
        Polygon((20.24999999999999, -0.2500000000000001), (21.399999999999988, -0.25000000000000006), (21.399999999999988, 0.24999999999999994), (20.24999999999999, 0.24999999999999994), (20.250000000000007, 1.399999999999995), (19.750000000000007, 1.400000000000002), (19.749999999999993, 0.25000000000000183), (18.599999999999994, 0.2500000000000099), (18.599999999999987, -0.24999999999999015), (19.74999999999999, -0.2500000000000002), (19.749999999999986, -1.3999999999999986), (20.249999999999982, -1.3999999999999986), align=None)
    extrude(amount=-CUT_EXTRUDE3_DEPTH)
    # Cut-Extrude3: the draft: its side faces are tilted about the plane it starts from
    cut_extrude3_sides = [cut_extrude3_tool.faces().sort_by_distance(p)[0] for p in [
        (9.65, -0.25, -20.825),
        (9.65, 0, -21.4),
        (9.65, 0.25, -20.825),
        (9.65, 0.825, -20.25),
        (9.65, 1.4, -20),
        (9.65, 0.825, -19.75),
        (9.65, 0.25, -19.175),
        (9.65, 0, -18.6),
        (9.65, -0.25, -19.175),
        (9.65, -0.825, -19.75),
        (9.65, -1.4, -20),
        (9.65, -0.825, -20.25),
    ]]
    draft(cut_extrude3_sides, Plane(origin=(9.799999999999999, 0, 0), x_dir=(0, 0, -1), z_dir=(1, 0, 0)), CUT_EXTRUDE3_DRAFT)


with BuildPart() as part_3:
    add(part_2.part)

    # Cut-Extrude3: cut by cut_extrude3_tool
    add(cut_extrude3_tool.part, mode=Mode.SUBTRACT)


with BuildPart() as cut_extrude3_profile_2_tool:
    # Sketch9 → Cut-Extrude3 profile 2 (with draft: the straight prism first)
    with BuildSketch(Plane(origin=(9.799999999999999, 0, 0), x_dir=(0, 0, -1), z_dir=(1, 0, 0))):
        Polygon((55.70121951219512, -4.189024390243886), (55.44878048780488, -5.310975609756081), (55.93658536585367, -5.420731707317056), (56.189024390243894, -4.298780487804862), (57.31097560975609, -4.551219512195095), (57.42073170731707, -4.063414634146313), (56.29878048780487, -3.8109756097560785), (56.551219512195104, -2.6890243902438806), (56.063414634146326, -2.5792682926829116), (55.81097560975609, -3.701219512195106), (54.6890243902439, -3.448780487804864), (54.579268292682926, -3.936585365853644), align=None)
    extrude(amount=-CUT_EXTRUDE3_PROFILE_2_DEPTH)
    # Cut-Extrude3 profile 2: the draft: its side faces are tilted about the plane it starts from
    cut_extrude3_profile_2_sides = [cut_extrude3_profile_2_tool.faces().sort_by_distance(p)[0] for p in [
        (9.65, -4.75, -55.575),
        (9.65, -5.365853659, -55.692682927),
        (9.65, -4.859756098, -56.062804878),
        (9.65, -4.425, -56.75),
        (9.65, -4.307317073, -57.365853659),
        (9.65, -3.937195122, -56.859756098),
        (9.65, -3.25, -56.425),
        (9.65, -2.634146341, -56.307317073),
        (9.65, -3.140243902, -55.937195122),
        (9.65, -3.575, -55.25),
        (9.65, -3.692682927, -54.634146341),
        (9.65, -4.062804878, -55.140243902),
    ]]
    draft(cut_extrude3_profile_2_sides, Plane(origin=(9.799999999999999, 0, 0), x_dir=(0, 0, -1), z_dir=(1, 0, 0)), CUT_EXTRUDE3_PROFILE_2_DRAFT)


with BuildPart() as part_4:
    add(part_3.part)

    # Cut-Extrude3 profile 2: cut by cut_extrude3_profile_2_tool
    add(cut_extrude3_profile_2_tool.part, mode=Mode.SUBTRACT)


solid = part_4.part
